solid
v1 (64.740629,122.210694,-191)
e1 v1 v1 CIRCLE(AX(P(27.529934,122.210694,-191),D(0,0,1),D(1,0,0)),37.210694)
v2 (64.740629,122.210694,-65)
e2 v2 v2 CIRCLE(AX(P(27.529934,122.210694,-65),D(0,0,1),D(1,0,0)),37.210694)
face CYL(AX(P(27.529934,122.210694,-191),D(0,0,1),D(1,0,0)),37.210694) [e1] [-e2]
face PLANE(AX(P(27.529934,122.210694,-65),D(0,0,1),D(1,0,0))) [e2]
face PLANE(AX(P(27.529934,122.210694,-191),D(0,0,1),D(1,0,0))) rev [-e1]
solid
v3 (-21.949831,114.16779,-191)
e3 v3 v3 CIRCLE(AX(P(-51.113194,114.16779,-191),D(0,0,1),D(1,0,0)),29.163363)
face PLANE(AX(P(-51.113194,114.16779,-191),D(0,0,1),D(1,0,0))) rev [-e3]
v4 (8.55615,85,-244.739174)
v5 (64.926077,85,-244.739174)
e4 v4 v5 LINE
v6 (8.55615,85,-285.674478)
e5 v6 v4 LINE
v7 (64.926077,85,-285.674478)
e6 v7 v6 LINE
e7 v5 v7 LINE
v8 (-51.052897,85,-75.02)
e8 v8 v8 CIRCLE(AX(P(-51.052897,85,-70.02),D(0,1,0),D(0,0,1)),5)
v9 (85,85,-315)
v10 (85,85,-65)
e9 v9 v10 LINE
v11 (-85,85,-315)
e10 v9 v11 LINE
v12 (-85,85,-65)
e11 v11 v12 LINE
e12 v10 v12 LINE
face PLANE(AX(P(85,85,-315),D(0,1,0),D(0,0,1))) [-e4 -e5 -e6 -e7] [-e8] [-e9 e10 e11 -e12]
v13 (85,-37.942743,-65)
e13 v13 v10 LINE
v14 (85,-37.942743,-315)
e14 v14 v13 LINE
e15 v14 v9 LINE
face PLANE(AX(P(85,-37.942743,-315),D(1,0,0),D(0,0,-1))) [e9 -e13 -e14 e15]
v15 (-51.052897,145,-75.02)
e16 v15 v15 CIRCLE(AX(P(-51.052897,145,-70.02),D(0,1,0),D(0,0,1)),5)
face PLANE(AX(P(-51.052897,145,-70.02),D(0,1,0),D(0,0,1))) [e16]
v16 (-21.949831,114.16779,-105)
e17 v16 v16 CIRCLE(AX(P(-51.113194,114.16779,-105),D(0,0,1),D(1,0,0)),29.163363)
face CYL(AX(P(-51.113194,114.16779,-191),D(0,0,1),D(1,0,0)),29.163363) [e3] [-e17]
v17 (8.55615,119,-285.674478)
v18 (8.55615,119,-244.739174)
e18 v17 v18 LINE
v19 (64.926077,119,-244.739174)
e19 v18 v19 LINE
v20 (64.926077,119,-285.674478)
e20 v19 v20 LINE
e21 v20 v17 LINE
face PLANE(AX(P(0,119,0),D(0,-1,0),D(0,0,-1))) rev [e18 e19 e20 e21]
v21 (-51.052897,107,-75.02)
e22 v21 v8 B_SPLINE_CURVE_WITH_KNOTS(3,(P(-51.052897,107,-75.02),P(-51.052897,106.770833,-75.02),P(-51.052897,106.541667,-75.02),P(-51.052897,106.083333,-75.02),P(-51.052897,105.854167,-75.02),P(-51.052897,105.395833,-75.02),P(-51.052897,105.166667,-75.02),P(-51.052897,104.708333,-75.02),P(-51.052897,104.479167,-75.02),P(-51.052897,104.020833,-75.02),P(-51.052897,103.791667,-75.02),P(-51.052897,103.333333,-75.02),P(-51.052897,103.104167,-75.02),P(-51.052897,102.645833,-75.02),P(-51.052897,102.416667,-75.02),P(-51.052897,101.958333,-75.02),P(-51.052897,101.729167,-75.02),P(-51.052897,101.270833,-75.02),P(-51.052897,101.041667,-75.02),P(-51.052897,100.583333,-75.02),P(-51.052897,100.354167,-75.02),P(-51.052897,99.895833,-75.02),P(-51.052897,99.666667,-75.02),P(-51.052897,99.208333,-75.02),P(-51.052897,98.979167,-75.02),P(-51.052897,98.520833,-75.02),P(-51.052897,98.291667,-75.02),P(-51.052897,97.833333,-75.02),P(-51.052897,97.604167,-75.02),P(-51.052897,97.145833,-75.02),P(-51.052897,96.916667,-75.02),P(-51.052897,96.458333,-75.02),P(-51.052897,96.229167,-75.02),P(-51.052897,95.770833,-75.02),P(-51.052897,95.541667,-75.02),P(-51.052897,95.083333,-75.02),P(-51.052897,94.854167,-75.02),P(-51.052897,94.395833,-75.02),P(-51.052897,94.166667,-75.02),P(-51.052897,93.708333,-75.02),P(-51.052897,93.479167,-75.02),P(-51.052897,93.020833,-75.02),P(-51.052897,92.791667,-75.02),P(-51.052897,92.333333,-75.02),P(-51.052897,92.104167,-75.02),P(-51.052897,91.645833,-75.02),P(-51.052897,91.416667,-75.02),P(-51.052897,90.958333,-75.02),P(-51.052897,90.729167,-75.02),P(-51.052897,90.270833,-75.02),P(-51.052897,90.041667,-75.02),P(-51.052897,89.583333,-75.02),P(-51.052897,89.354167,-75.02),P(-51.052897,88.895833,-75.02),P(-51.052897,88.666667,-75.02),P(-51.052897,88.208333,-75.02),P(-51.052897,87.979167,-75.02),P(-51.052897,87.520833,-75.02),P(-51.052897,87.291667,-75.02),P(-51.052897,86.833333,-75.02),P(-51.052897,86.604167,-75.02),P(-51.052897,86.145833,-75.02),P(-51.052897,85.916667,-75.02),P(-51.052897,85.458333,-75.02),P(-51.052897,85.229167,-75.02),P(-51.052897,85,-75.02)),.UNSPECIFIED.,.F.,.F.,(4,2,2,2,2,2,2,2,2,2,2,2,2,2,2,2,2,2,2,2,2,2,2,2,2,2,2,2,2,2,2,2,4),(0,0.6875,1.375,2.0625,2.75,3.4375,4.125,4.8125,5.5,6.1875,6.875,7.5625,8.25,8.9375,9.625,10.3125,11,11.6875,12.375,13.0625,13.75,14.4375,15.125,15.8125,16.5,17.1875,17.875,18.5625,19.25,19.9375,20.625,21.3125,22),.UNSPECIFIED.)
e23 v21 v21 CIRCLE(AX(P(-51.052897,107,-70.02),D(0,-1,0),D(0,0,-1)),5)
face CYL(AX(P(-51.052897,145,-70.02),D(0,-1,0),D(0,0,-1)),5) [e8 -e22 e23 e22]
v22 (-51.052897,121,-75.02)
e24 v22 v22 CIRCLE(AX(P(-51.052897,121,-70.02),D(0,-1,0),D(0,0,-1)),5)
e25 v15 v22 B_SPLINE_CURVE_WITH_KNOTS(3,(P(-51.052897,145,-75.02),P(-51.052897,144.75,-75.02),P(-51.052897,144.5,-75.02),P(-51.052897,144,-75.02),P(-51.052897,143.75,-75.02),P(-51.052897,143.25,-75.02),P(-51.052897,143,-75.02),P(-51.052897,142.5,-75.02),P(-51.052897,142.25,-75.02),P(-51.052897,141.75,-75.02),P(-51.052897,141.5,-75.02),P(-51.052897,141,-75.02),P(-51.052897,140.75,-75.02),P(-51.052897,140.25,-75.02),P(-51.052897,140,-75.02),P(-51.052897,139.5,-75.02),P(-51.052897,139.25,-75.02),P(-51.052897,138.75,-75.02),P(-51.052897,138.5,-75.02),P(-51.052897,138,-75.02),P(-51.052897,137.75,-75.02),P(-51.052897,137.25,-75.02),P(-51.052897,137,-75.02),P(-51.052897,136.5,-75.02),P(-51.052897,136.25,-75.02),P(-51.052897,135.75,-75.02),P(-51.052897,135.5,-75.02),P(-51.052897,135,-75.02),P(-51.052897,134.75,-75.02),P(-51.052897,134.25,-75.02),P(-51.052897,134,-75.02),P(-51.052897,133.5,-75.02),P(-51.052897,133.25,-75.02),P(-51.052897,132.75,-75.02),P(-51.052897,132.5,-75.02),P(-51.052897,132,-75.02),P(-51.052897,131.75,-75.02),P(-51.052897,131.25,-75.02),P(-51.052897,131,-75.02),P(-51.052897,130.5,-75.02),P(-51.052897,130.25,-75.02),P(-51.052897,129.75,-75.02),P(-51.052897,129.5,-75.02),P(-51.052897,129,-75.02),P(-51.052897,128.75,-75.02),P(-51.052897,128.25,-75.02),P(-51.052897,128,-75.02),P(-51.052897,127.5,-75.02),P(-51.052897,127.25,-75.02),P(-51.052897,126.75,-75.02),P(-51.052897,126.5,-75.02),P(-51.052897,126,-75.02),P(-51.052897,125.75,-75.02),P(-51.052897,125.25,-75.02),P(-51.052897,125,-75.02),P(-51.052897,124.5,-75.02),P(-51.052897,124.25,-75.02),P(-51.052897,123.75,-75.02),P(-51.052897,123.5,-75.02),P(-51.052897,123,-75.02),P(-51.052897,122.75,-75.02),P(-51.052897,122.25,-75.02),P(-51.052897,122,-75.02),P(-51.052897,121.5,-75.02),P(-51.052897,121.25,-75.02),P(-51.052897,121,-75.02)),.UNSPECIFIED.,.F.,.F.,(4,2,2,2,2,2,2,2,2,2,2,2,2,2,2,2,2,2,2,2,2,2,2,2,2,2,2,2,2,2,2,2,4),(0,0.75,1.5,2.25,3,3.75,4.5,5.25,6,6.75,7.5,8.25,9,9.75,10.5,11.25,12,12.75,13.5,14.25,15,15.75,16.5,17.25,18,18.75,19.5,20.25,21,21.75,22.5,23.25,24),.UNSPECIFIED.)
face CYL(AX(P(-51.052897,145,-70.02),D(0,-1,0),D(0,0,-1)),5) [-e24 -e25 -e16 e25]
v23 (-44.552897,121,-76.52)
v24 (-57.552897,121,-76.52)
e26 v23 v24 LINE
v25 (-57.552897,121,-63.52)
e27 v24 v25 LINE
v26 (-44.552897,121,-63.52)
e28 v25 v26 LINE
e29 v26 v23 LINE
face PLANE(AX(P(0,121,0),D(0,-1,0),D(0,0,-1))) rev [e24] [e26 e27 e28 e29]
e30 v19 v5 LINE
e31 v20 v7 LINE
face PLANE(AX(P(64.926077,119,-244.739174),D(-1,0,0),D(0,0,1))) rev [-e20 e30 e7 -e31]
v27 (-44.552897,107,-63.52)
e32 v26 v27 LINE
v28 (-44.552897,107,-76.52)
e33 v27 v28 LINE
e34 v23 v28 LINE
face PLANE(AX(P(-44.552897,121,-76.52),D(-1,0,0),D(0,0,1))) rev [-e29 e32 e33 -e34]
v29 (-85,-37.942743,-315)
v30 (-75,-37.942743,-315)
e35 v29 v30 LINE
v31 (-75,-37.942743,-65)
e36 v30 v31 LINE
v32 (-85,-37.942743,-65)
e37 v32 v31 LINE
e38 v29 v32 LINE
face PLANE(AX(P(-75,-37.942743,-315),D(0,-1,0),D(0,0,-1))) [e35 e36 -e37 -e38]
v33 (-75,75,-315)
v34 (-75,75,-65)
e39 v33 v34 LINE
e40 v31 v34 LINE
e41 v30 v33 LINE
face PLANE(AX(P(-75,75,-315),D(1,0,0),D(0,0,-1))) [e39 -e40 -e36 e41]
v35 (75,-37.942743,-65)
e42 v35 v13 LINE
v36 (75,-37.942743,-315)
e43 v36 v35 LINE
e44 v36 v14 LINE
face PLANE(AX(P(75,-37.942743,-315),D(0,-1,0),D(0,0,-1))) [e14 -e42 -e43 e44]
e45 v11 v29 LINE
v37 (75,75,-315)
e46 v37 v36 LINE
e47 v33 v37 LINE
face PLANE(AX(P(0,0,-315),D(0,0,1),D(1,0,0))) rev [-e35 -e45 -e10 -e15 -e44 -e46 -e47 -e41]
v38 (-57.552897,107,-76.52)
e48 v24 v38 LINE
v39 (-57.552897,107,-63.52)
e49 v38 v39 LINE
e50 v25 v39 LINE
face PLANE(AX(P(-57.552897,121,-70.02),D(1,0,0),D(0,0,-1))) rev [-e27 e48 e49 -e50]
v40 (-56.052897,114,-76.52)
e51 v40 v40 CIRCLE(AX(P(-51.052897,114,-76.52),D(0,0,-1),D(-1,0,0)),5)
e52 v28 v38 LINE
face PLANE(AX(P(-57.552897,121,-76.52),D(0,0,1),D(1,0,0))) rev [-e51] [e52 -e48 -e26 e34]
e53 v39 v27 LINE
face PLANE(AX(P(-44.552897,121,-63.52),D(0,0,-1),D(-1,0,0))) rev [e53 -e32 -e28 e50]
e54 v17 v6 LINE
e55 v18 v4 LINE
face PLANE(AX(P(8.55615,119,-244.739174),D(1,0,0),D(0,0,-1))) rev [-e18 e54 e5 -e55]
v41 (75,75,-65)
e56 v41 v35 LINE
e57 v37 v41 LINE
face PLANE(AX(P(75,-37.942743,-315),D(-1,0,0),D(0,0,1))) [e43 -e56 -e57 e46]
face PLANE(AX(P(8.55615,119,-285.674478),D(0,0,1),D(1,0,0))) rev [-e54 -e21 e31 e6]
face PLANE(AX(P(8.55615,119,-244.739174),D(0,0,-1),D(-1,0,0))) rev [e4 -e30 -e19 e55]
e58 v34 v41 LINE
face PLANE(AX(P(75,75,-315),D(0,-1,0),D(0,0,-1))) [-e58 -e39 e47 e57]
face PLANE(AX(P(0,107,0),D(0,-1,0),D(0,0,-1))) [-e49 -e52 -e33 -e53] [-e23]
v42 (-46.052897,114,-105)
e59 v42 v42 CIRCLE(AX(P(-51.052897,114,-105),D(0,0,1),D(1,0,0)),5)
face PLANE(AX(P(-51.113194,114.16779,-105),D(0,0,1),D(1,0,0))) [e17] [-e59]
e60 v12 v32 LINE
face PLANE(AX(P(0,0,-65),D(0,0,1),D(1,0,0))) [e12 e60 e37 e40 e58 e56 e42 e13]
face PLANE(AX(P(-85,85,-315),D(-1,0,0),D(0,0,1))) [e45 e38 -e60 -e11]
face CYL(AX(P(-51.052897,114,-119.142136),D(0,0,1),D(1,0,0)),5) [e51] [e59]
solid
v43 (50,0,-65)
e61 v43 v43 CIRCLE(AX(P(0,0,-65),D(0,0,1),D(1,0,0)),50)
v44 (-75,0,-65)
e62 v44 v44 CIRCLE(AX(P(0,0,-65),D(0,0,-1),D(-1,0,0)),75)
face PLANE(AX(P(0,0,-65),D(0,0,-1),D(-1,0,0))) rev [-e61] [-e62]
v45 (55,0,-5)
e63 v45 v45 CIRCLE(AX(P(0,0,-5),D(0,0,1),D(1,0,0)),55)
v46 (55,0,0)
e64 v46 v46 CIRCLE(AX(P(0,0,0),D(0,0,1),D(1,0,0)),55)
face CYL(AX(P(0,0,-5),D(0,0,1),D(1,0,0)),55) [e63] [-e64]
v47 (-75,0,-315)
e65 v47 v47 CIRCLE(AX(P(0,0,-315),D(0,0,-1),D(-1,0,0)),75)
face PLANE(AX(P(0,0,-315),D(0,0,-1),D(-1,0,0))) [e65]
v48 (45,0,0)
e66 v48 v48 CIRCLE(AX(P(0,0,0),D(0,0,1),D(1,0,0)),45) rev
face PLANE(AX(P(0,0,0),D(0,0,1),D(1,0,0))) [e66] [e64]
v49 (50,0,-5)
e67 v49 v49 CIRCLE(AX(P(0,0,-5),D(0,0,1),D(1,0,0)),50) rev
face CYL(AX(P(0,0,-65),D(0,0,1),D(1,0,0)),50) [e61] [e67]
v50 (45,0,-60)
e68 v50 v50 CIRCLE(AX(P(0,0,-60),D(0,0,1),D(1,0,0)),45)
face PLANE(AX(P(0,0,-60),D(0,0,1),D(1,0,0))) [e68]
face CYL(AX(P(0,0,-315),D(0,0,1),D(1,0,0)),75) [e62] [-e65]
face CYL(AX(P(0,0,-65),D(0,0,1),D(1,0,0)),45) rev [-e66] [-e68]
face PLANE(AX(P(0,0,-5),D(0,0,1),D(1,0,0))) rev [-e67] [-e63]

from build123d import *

# Parameters (mm, degrees)
SKETCH1_R                 = 50
BOSS_EXTRUDE1_DEPTH       = 65
SHELL1_T                  = -5
SKETCH3_R                 = 55
BOSS_EXTRUDE2_DEPTH       = 5
SHELL2_START              = -5
SHELL2_OUTLINE_R          = 45
SHELL2_DEPTH              = 5
SKETCH5_R                 = 75
BOSS_EXTRUDE3_DEPTH       = 250
BOSS_EXTRUDE4_DEPTH       = 250
SKETCH9_R                 = 37.210694341
BOSS_EXTRUDE5_DEPTH       = 126
SKETCH10_W                = 56.36992765
SKETCH10_H                = 40.935304603
BOSS_EXTRUDE6_DEPTH       = 34
SKETCH12_R                = 29.163363005
BOSS_EXTRUDE7_DEPTH       = 86
SKETCH16_R                = 5
BOSS_EXTRUDE10_DEPTH      = 60
BOSS_EXTRUDE11_DEPTH      = 7
BOSS_EXTRUDE11_DEPTH_BACK = 7
SKETCH19_R                = 5
BOSS_EXTRUDE12_DEPTH      = 28.48


# Read off the part's stored shape, not the designer's step: Shell2
with BuildPart() as part:
    # Sketch1 → Boss-Extrude1 (new body)
    with BuildSketch(Plane.XY):
        Circle(SKETCH1_R)
    extrude(amount=-BOSS_EXTRUDE1_DEPTH)

    # Shell1
    shell1_openings = [part.faces().sort_by_distance(p)[0] for p in [
        (0, 0, 0),
    ]]
    offset(amount=SHELL1_T, openings=shell1_openings, kind=Kind.INTERSECTION)

    # Sketch3 → Boss-Extrude2 (add)
    with BuildSketch(Plane.XY):
        Circle(SKETCH3_R)
    extrude(amount=-BOSS_EXTRUDE2_DEPTH)

    # Shell2 outline → Shell2 (cut)
    with BuildSketch(Plane.XY.offset(SHELL2_START)):
        Circle(SHELL2_OUTLINE_R)
    extrude(amount=SHELL2_DEPTH, mode=Mode.SUBTRACT)

    # Sketch5 → Boss-Extrude3 (add)
    with BuildSketch(Plane(origin=(0, 0, -65), x_dir=(-1, 0, 0), z_dir=(0, 0, -1))):
        Circle(SKETCH5_R)
    extrude(amount=BOSS_EXTRUDE3_DEPTH)


with BuildPart() as body_2:
    # Sketch6 → Boss-Extrude4 (new body)
    with BuildSketch(Plane.XY.offset(-65)):
        Polygon((75, -37.942743418), (85, -37.942743418), (85, 85), (-85, 85), (-85, -37.942743418), (-75, -37.942743418), (-75, 75), (75, 75), align=None)
    extrude(amount=-BOSS_EXTRUDE4_DEPTH)

    # Sketch10 → Boss-Extrude6 (add)
    with BuildSketch(Plane(origin=(0, 85, 0), x_dir=(1, 0, 0), z_dir=(0, 1, 0))):
        with Locations((36.741113558, 265.206826046)):
            Rectangle(SKETCH10_W, SKETCH10_H)
    extrude(amount=BOSS_EXTRUDE6_DEPTH)

    # Sketch16 → Boss-Extrude10 (add)
    with BuildSketch(Plane(origin=(0, 85, 0), x_dir=(1, 0, 0), z_dir=(0, 1, 0))):
        with Locations(Location((-51.052896517, 70.02, 0), (0, 0, 90))):
            Circle(SKETCH16_R)
    extrude(amount=BOSS_EXTRUDE10_DEPTH)

    # Sketch18 → Boss-Extrude11 (add, two sides: drawn at the far end of the back side and taken through both)
    with BuildSketch(Plane(origin=(0, 114, 0), x_dir=(1, 0, 0), z_dir=(0, 1, 0)).offset(-BOSS_EXTRUDE11_DEPTH_BACK)):
        Polygon((-57.552896517, 70.02), (-57.552896517, 76.52), (-44.552896517, 76.52), (-44.552896517, 63.52), (-57.552896517, 63.52), align=None)
    extrude(amount=BOSS_EXTRUDE11_DEPTH + BOSS_EXTRUDE11_DEPTH_BACK)



with BuildPart() as body_3:
    # Sketch9 → Boss-Extrude5 (new body)
    with BuildSketch(Plane.XY.offset(-65)):
        with Locations((27.529934173, 122.210694341)):
            Circle(SKETCH9_R)
    extrude(amount=-BOSS_EXTRUDE5_DEPTH)


with BuildPart() as body_4:
    # Sketch12 → Boss-Extrude7 (new body)
    with BuildSketch(Plane.XY.offset(-105)):
        with Locations((-51.113194065, 114.167789901)):
            Circle(SKETCH12_R)
    extrude(amount=-BOSS_EXTRUDE7_DEPTH)


with BuildPart() as body_2_1:
    add(body_2.part)

    add(body_4.part)  # Boss-Extrude12 merges body 4
    # Sketch19 → Boss-Extrude12 (add)
    with BuildSketch(Plane(origin=(0, 0, -76.52), x_dir=(-1, 0, 0), z_dir=(0, 0, -1))):
        with Locations(Location((51.052896517, 114, 0), (0, 0, 180))):
            Circle(SKETCH19_R)
    extrude(amount=BOSS_EXTRUDE12_DEPTH)


solid = Compound([part.part, body_3.part, body_2_1.part])
